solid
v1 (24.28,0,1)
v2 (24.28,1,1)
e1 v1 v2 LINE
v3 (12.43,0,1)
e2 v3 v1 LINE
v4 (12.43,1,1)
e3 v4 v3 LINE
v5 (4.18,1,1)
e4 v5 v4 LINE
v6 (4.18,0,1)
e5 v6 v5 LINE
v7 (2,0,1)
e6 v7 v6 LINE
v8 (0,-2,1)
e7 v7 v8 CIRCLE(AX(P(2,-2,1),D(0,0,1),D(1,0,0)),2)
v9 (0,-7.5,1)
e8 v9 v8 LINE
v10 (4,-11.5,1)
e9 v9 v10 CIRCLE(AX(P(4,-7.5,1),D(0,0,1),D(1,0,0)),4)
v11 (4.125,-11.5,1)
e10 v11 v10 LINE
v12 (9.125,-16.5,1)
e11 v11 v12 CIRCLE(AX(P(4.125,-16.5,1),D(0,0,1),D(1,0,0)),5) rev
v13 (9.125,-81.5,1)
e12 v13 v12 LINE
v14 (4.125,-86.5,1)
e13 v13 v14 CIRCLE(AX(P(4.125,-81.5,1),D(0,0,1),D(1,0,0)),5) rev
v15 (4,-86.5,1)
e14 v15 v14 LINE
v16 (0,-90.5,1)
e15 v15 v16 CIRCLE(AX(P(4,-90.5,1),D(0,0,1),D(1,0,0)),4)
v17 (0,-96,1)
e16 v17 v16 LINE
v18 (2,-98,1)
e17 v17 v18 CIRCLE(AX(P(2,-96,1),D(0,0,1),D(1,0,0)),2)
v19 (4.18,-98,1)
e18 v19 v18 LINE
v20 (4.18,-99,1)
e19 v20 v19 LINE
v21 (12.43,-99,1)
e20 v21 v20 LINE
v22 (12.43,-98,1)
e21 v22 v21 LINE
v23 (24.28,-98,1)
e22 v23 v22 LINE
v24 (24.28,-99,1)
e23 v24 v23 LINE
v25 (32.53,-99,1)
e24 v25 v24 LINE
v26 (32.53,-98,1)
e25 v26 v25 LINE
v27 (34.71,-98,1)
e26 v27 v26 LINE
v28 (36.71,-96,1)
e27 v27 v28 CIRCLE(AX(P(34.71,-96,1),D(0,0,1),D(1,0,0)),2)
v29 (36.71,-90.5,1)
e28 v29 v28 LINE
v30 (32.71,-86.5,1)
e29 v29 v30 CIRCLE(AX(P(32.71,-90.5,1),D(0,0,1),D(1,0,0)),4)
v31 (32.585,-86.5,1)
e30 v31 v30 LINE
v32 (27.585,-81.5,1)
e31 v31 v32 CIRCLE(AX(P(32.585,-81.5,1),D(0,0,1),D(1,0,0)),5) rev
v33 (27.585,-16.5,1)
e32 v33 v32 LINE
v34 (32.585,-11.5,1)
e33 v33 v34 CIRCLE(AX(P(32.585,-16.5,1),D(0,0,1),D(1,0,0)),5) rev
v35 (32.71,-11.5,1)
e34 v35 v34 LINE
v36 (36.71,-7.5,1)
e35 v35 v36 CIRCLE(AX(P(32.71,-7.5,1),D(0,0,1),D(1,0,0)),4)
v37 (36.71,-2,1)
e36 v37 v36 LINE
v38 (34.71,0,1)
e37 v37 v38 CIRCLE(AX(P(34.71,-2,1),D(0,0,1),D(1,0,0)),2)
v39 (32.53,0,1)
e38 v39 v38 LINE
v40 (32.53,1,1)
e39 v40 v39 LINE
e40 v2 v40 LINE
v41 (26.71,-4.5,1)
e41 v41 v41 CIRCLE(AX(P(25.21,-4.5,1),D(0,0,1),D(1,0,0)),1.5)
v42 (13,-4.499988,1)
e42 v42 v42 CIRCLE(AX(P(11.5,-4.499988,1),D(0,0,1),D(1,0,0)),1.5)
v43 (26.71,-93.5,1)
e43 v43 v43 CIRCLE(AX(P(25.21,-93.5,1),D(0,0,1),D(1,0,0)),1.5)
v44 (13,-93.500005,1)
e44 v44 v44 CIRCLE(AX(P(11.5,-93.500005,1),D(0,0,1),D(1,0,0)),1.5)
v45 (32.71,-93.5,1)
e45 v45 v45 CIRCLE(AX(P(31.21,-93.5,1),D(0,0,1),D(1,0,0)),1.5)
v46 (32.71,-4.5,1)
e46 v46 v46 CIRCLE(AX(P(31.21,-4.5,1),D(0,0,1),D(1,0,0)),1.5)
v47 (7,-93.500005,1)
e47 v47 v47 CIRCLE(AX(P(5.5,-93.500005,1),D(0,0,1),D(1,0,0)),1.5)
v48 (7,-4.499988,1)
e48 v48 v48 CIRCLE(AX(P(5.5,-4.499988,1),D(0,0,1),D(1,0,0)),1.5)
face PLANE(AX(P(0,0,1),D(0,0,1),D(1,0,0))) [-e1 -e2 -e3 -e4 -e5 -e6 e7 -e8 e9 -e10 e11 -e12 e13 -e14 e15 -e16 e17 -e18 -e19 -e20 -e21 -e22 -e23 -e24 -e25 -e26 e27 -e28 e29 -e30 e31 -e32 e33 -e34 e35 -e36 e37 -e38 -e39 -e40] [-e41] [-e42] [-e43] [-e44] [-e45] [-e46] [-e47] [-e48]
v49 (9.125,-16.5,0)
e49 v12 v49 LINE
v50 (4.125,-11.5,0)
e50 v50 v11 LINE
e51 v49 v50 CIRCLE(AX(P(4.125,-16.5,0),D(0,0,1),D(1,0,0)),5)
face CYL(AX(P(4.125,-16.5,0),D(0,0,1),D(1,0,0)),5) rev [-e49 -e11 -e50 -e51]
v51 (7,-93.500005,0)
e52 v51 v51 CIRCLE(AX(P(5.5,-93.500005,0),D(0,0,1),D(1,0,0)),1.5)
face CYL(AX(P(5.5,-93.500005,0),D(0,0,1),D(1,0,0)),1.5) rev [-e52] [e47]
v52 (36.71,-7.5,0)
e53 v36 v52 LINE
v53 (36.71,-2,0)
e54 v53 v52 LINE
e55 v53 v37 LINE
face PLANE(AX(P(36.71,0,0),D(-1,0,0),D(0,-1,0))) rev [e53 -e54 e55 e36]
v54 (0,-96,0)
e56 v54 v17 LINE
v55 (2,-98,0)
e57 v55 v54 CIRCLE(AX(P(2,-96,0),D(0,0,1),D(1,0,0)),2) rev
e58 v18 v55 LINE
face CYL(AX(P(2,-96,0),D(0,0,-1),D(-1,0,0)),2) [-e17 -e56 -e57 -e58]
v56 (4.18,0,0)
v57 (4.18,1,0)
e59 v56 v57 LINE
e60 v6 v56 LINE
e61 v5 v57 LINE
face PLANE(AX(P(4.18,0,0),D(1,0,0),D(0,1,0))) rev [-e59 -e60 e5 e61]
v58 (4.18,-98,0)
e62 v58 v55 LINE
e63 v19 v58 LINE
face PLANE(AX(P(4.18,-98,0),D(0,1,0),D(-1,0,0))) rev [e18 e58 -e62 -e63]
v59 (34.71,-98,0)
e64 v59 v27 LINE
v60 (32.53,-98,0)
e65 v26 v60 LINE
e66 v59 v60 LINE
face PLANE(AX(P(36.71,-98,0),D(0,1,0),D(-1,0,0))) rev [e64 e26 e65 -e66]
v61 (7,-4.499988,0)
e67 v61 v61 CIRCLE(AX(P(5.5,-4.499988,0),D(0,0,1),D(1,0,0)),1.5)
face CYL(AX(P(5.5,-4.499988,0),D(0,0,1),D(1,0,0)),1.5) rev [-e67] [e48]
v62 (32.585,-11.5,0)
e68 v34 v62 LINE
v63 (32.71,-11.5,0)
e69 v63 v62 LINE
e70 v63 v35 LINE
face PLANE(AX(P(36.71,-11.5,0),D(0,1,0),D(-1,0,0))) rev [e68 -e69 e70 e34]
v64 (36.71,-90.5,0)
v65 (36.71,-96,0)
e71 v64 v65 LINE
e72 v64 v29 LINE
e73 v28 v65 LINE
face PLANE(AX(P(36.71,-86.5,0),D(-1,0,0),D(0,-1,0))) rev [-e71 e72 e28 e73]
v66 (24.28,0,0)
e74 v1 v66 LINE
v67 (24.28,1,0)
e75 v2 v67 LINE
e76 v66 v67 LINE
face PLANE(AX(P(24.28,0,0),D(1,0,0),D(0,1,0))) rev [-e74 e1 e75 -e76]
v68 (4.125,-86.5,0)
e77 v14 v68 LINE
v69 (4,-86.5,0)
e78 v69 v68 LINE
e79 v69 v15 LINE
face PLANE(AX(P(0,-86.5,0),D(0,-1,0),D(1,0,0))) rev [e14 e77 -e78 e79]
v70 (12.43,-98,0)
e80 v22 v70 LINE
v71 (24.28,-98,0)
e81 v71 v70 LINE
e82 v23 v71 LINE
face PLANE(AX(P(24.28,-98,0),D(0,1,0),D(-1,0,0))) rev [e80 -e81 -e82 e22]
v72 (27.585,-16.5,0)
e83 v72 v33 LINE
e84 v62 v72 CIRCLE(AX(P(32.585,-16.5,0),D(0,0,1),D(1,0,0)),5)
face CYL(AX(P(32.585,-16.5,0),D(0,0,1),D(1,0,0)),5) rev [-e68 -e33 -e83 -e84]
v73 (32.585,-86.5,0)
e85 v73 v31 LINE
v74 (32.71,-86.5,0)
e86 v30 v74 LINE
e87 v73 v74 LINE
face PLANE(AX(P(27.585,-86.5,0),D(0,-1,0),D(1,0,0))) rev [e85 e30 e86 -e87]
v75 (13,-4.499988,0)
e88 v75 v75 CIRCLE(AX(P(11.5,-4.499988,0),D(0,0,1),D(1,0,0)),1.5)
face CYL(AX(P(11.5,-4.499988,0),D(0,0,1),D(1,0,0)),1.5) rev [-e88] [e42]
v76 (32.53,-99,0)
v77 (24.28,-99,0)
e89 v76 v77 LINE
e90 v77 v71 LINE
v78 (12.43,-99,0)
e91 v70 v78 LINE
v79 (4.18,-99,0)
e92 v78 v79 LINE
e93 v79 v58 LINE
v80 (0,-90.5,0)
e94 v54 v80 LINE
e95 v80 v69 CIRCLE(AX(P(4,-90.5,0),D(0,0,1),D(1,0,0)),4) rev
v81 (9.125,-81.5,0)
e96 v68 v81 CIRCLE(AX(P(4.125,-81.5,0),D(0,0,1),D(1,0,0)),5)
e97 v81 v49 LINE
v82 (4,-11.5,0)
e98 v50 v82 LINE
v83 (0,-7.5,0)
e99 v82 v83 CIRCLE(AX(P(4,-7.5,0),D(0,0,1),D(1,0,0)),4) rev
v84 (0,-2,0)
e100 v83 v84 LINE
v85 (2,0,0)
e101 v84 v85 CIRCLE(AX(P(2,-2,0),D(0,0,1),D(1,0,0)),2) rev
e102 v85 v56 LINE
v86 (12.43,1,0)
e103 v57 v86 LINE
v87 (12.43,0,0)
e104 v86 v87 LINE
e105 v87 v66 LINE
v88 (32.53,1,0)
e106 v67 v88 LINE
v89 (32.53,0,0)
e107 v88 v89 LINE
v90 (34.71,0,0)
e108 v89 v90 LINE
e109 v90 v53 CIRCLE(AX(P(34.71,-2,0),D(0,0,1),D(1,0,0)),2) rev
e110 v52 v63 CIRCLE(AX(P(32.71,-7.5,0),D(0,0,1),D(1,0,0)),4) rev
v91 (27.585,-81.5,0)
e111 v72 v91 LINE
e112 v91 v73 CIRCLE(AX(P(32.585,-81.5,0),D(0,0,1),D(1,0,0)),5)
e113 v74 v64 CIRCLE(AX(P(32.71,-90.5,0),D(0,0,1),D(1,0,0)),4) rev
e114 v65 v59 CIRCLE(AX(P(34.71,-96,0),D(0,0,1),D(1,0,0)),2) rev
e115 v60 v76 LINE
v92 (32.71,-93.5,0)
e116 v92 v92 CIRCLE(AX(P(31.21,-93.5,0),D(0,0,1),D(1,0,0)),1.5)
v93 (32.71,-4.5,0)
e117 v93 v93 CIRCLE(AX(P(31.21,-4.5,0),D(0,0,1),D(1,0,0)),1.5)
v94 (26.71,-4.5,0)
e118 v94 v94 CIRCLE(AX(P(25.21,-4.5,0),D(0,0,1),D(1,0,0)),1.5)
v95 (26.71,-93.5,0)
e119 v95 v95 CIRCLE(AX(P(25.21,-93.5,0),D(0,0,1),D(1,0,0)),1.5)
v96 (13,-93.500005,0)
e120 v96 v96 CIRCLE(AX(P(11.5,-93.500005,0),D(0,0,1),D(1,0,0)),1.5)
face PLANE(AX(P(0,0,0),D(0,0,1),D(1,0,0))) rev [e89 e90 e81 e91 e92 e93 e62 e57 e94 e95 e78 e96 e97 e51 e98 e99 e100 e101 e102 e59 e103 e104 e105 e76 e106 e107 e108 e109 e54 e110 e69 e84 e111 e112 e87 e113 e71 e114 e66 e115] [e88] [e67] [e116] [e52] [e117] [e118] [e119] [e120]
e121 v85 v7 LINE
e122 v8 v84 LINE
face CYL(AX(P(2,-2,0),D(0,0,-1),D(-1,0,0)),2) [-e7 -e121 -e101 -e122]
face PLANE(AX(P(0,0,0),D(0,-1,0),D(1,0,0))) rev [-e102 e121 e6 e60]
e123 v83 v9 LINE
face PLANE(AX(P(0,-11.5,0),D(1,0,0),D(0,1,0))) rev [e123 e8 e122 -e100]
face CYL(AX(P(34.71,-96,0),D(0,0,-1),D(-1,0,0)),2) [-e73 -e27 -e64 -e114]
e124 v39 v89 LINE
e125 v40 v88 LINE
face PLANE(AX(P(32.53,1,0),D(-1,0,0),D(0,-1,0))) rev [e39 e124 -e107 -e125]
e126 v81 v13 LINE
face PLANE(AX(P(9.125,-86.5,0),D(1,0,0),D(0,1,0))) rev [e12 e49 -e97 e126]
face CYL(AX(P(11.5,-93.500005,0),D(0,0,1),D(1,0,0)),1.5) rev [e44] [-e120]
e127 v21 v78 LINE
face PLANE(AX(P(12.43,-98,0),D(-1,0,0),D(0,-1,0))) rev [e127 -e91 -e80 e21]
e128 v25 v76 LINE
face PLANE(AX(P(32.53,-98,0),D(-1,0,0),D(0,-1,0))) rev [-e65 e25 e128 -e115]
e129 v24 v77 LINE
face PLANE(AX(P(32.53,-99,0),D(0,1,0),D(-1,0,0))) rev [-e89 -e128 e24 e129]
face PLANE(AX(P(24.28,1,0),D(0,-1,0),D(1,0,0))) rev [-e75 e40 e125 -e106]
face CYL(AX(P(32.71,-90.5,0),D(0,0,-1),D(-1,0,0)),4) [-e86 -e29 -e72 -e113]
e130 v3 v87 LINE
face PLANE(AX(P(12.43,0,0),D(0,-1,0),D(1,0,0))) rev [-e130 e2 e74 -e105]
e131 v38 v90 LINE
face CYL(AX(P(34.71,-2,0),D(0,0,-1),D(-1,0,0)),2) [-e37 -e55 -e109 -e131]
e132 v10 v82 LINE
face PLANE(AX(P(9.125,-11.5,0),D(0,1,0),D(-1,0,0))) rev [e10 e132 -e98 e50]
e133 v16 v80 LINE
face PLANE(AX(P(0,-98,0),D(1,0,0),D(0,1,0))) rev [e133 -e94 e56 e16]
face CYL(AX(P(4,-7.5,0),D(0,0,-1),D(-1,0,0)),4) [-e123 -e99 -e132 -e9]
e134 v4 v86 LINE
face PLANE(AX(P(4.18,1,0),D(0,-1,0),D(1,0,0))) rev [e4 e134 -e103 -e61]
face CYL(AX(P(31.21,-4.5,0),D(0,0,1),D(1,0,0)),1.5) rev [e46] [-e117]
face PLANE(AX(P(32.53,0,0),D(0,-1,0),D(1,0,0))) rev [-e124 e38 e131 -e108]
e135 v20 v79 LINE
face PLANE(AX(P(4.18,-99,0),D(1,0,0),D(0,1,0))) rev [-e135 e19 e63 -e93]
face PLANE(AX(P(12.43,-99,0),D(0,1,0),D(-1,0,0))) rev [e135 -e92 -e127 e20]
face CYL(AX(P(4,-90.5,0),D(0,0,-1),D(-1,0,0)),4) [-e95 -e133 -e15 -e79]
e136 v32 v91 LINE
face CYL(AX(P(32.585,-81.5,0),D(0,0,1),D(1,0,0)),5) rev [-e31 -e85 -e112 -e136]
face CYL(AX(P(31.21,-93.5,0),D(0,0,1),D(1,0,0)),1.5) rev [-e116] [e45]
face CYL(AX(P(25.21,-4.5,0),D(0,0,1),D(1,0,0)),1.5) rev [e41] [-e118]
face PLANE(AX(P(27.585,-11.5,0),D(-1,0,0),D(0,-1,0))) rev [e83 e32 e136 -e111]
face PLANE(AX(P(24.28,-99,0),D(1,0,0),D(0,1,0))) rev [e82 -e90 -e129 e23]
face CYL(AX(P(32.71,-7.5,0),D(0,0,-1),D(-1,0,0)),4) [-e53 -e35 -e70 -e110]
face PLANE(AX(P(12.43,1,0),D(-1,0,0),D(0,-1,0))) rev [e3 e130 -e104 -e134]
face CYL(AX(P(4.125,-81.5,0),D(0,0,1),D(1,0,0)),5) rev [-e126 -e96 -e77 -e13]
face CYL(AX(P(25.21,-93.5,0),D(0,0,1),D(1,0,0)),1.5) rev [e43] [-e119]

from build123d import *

# Parameters (mm, degrees)
BOSS_EXTRUDE2_DEPTH = 1
SKETCH2_R           = 1.5
SKETCH2_R_2         = 1.499999993
CUT_EXTRUDE8_DEPTH  = 3
FILLET2_R           = 4
FILLET3_R           = 5
FILLET4_R           = 4
FILLET5_R           = 5
FILLET6_R           = 2
FILLET7_R           = 2
FILLET8_R           = 2
FILLET9_R           = 2
FILLET12_R          = 4
FILLET13_R          = 5


with BuildPart() as part:
    # Sketch1 → Boss-Extrude2 (new body)
    with BuildSketch(Plane.XY):
        Polygon((0, 0), (4.18, 0), (4.18, 1), (12.43, 1), (12.43, 0), (24.28, 0), (24.28, 1), (32.53, 1), (32.53, 0), (36.71, 0), (36.71, -11.5), (27.585, -11.5), (27.585, -86.5), (36.71, -86.5), (36.71, -98), (32.53, -98), (32.53, -99), (24.28, -99), (24.28, -98), (12.43, -98), (12.43, -99), (4.18, -99), (4.18, -98), (0, -98), (0, -86.5), (9.125, -86.5), (9.125, -11.5), (0, -11.5), align=None)
    extrude(amount=BOSS_EXTRUDE2_DEPTH)

    # Sketch2 → Cut-Extrude8 (cut)
    with BuildSketch(Plane.XY):
        with Locations((5.5, -4.499987612)):
            Circle(SKETCH2_R)
        with Locations((11.5, -4.499987612)):
            Circle(SKETCH2_R)
        with Locations((25.21, -4.5)):
            Circle(SKETCH2_R)
        with Locations((31.21, -4.5)):
            Circle(SKETCH2_R_2)
        with Locations((5.5, -93.500004994)):
            Circle(SKETCH2_R)
        with Locations((11.5, -93.500004994)):
            Circle(SKETCH2_R)
        with Locations((25.21, -93.5)):
            Circle(SKETCH2_R)
        with Locations((31.21, -93.5)):
            Circle(SKETCH2_R)
    extrude(amount=CUT_EXTRUDE8_DEPTH, mode=Mode.SUBTRACT)

    # Fillet2
    fillet2_edges = [part.edges().sort_by_distance(p)[0] for p in [
        (36.71, -86.5, 0.5),
    ]]
    fillet(fillet2_edges, radius=FILLET2_R)

    # Fillet3
    fillet3_edges = [part.edges().sort_by_distance(p)[0] for p in [
        (27.585, -86.5, 0.5),
    ]]
    fillet(fillet3_edges, radius=FILLET3_R)

    # Fillet4
    fillet4_edges = [part.edges().sort_by_distance(p)[0] for p in [
        (0, -86.5, 0.5),
    ]]
    fillet(fillet4_edges, radius=FILLET4_R)

    # Fillet5
    fillet5_edges = [part.edges().sort_by_distance(p)[0] for p in [
        (9.125, -86.5, 0.5),
    ]]
    fillet(fillet5_edges, radius=FILLET5_R)

    # Fillet6
    fillet6_edges = [part.edges().sort_by_distance(p)[0] for p in [
        (0, -98, 0.5),
    ]]
    fillet(fillet6_edges, radius=FILLET6_R)

    # Fillet7
    fillet7_edges = [part.edges().sort_by_distance(p)[0] for p in [
        (36.71, -98, 0.5),
    ]]
    fillet(fillet7_edges, radius=FILLET7_R)

    # Fillet8
    fillet8_edges = [part.edges().sort_by_distance(p)[0] for p in [
        (0, 0, 0.5),
    ]]
    fillet(fillet8_edges, radius=FILLET8_R)

    # Fillet9
    fillet9_edges = [part.edges().sort_by_distance(p)[0] for p in [
        (36.71, 0, 0.5),
    ]]
    fillet(fillet9_edges, radius=FILLET9_R)

    # Fillet12
    fillet12_edges = [part.edges().sort_by_distance(p)[0] for p in [
        (36.71, -11.5, 0.5),
        (0, -11.5, 0.5),
    ]]
    fillet(fillet12_edges, radius=FILLET12_R)

    # Fillet13
    fillet13_edges = [part.edges().sort_by_distance(p)[0] for p in [
        (27.585, -11.5, 0.5),
        (9.125, -11.5, 0.5),
    ]]
    fillet(fillet13_edges, radius=FILLET13_R)


solid = part.part
